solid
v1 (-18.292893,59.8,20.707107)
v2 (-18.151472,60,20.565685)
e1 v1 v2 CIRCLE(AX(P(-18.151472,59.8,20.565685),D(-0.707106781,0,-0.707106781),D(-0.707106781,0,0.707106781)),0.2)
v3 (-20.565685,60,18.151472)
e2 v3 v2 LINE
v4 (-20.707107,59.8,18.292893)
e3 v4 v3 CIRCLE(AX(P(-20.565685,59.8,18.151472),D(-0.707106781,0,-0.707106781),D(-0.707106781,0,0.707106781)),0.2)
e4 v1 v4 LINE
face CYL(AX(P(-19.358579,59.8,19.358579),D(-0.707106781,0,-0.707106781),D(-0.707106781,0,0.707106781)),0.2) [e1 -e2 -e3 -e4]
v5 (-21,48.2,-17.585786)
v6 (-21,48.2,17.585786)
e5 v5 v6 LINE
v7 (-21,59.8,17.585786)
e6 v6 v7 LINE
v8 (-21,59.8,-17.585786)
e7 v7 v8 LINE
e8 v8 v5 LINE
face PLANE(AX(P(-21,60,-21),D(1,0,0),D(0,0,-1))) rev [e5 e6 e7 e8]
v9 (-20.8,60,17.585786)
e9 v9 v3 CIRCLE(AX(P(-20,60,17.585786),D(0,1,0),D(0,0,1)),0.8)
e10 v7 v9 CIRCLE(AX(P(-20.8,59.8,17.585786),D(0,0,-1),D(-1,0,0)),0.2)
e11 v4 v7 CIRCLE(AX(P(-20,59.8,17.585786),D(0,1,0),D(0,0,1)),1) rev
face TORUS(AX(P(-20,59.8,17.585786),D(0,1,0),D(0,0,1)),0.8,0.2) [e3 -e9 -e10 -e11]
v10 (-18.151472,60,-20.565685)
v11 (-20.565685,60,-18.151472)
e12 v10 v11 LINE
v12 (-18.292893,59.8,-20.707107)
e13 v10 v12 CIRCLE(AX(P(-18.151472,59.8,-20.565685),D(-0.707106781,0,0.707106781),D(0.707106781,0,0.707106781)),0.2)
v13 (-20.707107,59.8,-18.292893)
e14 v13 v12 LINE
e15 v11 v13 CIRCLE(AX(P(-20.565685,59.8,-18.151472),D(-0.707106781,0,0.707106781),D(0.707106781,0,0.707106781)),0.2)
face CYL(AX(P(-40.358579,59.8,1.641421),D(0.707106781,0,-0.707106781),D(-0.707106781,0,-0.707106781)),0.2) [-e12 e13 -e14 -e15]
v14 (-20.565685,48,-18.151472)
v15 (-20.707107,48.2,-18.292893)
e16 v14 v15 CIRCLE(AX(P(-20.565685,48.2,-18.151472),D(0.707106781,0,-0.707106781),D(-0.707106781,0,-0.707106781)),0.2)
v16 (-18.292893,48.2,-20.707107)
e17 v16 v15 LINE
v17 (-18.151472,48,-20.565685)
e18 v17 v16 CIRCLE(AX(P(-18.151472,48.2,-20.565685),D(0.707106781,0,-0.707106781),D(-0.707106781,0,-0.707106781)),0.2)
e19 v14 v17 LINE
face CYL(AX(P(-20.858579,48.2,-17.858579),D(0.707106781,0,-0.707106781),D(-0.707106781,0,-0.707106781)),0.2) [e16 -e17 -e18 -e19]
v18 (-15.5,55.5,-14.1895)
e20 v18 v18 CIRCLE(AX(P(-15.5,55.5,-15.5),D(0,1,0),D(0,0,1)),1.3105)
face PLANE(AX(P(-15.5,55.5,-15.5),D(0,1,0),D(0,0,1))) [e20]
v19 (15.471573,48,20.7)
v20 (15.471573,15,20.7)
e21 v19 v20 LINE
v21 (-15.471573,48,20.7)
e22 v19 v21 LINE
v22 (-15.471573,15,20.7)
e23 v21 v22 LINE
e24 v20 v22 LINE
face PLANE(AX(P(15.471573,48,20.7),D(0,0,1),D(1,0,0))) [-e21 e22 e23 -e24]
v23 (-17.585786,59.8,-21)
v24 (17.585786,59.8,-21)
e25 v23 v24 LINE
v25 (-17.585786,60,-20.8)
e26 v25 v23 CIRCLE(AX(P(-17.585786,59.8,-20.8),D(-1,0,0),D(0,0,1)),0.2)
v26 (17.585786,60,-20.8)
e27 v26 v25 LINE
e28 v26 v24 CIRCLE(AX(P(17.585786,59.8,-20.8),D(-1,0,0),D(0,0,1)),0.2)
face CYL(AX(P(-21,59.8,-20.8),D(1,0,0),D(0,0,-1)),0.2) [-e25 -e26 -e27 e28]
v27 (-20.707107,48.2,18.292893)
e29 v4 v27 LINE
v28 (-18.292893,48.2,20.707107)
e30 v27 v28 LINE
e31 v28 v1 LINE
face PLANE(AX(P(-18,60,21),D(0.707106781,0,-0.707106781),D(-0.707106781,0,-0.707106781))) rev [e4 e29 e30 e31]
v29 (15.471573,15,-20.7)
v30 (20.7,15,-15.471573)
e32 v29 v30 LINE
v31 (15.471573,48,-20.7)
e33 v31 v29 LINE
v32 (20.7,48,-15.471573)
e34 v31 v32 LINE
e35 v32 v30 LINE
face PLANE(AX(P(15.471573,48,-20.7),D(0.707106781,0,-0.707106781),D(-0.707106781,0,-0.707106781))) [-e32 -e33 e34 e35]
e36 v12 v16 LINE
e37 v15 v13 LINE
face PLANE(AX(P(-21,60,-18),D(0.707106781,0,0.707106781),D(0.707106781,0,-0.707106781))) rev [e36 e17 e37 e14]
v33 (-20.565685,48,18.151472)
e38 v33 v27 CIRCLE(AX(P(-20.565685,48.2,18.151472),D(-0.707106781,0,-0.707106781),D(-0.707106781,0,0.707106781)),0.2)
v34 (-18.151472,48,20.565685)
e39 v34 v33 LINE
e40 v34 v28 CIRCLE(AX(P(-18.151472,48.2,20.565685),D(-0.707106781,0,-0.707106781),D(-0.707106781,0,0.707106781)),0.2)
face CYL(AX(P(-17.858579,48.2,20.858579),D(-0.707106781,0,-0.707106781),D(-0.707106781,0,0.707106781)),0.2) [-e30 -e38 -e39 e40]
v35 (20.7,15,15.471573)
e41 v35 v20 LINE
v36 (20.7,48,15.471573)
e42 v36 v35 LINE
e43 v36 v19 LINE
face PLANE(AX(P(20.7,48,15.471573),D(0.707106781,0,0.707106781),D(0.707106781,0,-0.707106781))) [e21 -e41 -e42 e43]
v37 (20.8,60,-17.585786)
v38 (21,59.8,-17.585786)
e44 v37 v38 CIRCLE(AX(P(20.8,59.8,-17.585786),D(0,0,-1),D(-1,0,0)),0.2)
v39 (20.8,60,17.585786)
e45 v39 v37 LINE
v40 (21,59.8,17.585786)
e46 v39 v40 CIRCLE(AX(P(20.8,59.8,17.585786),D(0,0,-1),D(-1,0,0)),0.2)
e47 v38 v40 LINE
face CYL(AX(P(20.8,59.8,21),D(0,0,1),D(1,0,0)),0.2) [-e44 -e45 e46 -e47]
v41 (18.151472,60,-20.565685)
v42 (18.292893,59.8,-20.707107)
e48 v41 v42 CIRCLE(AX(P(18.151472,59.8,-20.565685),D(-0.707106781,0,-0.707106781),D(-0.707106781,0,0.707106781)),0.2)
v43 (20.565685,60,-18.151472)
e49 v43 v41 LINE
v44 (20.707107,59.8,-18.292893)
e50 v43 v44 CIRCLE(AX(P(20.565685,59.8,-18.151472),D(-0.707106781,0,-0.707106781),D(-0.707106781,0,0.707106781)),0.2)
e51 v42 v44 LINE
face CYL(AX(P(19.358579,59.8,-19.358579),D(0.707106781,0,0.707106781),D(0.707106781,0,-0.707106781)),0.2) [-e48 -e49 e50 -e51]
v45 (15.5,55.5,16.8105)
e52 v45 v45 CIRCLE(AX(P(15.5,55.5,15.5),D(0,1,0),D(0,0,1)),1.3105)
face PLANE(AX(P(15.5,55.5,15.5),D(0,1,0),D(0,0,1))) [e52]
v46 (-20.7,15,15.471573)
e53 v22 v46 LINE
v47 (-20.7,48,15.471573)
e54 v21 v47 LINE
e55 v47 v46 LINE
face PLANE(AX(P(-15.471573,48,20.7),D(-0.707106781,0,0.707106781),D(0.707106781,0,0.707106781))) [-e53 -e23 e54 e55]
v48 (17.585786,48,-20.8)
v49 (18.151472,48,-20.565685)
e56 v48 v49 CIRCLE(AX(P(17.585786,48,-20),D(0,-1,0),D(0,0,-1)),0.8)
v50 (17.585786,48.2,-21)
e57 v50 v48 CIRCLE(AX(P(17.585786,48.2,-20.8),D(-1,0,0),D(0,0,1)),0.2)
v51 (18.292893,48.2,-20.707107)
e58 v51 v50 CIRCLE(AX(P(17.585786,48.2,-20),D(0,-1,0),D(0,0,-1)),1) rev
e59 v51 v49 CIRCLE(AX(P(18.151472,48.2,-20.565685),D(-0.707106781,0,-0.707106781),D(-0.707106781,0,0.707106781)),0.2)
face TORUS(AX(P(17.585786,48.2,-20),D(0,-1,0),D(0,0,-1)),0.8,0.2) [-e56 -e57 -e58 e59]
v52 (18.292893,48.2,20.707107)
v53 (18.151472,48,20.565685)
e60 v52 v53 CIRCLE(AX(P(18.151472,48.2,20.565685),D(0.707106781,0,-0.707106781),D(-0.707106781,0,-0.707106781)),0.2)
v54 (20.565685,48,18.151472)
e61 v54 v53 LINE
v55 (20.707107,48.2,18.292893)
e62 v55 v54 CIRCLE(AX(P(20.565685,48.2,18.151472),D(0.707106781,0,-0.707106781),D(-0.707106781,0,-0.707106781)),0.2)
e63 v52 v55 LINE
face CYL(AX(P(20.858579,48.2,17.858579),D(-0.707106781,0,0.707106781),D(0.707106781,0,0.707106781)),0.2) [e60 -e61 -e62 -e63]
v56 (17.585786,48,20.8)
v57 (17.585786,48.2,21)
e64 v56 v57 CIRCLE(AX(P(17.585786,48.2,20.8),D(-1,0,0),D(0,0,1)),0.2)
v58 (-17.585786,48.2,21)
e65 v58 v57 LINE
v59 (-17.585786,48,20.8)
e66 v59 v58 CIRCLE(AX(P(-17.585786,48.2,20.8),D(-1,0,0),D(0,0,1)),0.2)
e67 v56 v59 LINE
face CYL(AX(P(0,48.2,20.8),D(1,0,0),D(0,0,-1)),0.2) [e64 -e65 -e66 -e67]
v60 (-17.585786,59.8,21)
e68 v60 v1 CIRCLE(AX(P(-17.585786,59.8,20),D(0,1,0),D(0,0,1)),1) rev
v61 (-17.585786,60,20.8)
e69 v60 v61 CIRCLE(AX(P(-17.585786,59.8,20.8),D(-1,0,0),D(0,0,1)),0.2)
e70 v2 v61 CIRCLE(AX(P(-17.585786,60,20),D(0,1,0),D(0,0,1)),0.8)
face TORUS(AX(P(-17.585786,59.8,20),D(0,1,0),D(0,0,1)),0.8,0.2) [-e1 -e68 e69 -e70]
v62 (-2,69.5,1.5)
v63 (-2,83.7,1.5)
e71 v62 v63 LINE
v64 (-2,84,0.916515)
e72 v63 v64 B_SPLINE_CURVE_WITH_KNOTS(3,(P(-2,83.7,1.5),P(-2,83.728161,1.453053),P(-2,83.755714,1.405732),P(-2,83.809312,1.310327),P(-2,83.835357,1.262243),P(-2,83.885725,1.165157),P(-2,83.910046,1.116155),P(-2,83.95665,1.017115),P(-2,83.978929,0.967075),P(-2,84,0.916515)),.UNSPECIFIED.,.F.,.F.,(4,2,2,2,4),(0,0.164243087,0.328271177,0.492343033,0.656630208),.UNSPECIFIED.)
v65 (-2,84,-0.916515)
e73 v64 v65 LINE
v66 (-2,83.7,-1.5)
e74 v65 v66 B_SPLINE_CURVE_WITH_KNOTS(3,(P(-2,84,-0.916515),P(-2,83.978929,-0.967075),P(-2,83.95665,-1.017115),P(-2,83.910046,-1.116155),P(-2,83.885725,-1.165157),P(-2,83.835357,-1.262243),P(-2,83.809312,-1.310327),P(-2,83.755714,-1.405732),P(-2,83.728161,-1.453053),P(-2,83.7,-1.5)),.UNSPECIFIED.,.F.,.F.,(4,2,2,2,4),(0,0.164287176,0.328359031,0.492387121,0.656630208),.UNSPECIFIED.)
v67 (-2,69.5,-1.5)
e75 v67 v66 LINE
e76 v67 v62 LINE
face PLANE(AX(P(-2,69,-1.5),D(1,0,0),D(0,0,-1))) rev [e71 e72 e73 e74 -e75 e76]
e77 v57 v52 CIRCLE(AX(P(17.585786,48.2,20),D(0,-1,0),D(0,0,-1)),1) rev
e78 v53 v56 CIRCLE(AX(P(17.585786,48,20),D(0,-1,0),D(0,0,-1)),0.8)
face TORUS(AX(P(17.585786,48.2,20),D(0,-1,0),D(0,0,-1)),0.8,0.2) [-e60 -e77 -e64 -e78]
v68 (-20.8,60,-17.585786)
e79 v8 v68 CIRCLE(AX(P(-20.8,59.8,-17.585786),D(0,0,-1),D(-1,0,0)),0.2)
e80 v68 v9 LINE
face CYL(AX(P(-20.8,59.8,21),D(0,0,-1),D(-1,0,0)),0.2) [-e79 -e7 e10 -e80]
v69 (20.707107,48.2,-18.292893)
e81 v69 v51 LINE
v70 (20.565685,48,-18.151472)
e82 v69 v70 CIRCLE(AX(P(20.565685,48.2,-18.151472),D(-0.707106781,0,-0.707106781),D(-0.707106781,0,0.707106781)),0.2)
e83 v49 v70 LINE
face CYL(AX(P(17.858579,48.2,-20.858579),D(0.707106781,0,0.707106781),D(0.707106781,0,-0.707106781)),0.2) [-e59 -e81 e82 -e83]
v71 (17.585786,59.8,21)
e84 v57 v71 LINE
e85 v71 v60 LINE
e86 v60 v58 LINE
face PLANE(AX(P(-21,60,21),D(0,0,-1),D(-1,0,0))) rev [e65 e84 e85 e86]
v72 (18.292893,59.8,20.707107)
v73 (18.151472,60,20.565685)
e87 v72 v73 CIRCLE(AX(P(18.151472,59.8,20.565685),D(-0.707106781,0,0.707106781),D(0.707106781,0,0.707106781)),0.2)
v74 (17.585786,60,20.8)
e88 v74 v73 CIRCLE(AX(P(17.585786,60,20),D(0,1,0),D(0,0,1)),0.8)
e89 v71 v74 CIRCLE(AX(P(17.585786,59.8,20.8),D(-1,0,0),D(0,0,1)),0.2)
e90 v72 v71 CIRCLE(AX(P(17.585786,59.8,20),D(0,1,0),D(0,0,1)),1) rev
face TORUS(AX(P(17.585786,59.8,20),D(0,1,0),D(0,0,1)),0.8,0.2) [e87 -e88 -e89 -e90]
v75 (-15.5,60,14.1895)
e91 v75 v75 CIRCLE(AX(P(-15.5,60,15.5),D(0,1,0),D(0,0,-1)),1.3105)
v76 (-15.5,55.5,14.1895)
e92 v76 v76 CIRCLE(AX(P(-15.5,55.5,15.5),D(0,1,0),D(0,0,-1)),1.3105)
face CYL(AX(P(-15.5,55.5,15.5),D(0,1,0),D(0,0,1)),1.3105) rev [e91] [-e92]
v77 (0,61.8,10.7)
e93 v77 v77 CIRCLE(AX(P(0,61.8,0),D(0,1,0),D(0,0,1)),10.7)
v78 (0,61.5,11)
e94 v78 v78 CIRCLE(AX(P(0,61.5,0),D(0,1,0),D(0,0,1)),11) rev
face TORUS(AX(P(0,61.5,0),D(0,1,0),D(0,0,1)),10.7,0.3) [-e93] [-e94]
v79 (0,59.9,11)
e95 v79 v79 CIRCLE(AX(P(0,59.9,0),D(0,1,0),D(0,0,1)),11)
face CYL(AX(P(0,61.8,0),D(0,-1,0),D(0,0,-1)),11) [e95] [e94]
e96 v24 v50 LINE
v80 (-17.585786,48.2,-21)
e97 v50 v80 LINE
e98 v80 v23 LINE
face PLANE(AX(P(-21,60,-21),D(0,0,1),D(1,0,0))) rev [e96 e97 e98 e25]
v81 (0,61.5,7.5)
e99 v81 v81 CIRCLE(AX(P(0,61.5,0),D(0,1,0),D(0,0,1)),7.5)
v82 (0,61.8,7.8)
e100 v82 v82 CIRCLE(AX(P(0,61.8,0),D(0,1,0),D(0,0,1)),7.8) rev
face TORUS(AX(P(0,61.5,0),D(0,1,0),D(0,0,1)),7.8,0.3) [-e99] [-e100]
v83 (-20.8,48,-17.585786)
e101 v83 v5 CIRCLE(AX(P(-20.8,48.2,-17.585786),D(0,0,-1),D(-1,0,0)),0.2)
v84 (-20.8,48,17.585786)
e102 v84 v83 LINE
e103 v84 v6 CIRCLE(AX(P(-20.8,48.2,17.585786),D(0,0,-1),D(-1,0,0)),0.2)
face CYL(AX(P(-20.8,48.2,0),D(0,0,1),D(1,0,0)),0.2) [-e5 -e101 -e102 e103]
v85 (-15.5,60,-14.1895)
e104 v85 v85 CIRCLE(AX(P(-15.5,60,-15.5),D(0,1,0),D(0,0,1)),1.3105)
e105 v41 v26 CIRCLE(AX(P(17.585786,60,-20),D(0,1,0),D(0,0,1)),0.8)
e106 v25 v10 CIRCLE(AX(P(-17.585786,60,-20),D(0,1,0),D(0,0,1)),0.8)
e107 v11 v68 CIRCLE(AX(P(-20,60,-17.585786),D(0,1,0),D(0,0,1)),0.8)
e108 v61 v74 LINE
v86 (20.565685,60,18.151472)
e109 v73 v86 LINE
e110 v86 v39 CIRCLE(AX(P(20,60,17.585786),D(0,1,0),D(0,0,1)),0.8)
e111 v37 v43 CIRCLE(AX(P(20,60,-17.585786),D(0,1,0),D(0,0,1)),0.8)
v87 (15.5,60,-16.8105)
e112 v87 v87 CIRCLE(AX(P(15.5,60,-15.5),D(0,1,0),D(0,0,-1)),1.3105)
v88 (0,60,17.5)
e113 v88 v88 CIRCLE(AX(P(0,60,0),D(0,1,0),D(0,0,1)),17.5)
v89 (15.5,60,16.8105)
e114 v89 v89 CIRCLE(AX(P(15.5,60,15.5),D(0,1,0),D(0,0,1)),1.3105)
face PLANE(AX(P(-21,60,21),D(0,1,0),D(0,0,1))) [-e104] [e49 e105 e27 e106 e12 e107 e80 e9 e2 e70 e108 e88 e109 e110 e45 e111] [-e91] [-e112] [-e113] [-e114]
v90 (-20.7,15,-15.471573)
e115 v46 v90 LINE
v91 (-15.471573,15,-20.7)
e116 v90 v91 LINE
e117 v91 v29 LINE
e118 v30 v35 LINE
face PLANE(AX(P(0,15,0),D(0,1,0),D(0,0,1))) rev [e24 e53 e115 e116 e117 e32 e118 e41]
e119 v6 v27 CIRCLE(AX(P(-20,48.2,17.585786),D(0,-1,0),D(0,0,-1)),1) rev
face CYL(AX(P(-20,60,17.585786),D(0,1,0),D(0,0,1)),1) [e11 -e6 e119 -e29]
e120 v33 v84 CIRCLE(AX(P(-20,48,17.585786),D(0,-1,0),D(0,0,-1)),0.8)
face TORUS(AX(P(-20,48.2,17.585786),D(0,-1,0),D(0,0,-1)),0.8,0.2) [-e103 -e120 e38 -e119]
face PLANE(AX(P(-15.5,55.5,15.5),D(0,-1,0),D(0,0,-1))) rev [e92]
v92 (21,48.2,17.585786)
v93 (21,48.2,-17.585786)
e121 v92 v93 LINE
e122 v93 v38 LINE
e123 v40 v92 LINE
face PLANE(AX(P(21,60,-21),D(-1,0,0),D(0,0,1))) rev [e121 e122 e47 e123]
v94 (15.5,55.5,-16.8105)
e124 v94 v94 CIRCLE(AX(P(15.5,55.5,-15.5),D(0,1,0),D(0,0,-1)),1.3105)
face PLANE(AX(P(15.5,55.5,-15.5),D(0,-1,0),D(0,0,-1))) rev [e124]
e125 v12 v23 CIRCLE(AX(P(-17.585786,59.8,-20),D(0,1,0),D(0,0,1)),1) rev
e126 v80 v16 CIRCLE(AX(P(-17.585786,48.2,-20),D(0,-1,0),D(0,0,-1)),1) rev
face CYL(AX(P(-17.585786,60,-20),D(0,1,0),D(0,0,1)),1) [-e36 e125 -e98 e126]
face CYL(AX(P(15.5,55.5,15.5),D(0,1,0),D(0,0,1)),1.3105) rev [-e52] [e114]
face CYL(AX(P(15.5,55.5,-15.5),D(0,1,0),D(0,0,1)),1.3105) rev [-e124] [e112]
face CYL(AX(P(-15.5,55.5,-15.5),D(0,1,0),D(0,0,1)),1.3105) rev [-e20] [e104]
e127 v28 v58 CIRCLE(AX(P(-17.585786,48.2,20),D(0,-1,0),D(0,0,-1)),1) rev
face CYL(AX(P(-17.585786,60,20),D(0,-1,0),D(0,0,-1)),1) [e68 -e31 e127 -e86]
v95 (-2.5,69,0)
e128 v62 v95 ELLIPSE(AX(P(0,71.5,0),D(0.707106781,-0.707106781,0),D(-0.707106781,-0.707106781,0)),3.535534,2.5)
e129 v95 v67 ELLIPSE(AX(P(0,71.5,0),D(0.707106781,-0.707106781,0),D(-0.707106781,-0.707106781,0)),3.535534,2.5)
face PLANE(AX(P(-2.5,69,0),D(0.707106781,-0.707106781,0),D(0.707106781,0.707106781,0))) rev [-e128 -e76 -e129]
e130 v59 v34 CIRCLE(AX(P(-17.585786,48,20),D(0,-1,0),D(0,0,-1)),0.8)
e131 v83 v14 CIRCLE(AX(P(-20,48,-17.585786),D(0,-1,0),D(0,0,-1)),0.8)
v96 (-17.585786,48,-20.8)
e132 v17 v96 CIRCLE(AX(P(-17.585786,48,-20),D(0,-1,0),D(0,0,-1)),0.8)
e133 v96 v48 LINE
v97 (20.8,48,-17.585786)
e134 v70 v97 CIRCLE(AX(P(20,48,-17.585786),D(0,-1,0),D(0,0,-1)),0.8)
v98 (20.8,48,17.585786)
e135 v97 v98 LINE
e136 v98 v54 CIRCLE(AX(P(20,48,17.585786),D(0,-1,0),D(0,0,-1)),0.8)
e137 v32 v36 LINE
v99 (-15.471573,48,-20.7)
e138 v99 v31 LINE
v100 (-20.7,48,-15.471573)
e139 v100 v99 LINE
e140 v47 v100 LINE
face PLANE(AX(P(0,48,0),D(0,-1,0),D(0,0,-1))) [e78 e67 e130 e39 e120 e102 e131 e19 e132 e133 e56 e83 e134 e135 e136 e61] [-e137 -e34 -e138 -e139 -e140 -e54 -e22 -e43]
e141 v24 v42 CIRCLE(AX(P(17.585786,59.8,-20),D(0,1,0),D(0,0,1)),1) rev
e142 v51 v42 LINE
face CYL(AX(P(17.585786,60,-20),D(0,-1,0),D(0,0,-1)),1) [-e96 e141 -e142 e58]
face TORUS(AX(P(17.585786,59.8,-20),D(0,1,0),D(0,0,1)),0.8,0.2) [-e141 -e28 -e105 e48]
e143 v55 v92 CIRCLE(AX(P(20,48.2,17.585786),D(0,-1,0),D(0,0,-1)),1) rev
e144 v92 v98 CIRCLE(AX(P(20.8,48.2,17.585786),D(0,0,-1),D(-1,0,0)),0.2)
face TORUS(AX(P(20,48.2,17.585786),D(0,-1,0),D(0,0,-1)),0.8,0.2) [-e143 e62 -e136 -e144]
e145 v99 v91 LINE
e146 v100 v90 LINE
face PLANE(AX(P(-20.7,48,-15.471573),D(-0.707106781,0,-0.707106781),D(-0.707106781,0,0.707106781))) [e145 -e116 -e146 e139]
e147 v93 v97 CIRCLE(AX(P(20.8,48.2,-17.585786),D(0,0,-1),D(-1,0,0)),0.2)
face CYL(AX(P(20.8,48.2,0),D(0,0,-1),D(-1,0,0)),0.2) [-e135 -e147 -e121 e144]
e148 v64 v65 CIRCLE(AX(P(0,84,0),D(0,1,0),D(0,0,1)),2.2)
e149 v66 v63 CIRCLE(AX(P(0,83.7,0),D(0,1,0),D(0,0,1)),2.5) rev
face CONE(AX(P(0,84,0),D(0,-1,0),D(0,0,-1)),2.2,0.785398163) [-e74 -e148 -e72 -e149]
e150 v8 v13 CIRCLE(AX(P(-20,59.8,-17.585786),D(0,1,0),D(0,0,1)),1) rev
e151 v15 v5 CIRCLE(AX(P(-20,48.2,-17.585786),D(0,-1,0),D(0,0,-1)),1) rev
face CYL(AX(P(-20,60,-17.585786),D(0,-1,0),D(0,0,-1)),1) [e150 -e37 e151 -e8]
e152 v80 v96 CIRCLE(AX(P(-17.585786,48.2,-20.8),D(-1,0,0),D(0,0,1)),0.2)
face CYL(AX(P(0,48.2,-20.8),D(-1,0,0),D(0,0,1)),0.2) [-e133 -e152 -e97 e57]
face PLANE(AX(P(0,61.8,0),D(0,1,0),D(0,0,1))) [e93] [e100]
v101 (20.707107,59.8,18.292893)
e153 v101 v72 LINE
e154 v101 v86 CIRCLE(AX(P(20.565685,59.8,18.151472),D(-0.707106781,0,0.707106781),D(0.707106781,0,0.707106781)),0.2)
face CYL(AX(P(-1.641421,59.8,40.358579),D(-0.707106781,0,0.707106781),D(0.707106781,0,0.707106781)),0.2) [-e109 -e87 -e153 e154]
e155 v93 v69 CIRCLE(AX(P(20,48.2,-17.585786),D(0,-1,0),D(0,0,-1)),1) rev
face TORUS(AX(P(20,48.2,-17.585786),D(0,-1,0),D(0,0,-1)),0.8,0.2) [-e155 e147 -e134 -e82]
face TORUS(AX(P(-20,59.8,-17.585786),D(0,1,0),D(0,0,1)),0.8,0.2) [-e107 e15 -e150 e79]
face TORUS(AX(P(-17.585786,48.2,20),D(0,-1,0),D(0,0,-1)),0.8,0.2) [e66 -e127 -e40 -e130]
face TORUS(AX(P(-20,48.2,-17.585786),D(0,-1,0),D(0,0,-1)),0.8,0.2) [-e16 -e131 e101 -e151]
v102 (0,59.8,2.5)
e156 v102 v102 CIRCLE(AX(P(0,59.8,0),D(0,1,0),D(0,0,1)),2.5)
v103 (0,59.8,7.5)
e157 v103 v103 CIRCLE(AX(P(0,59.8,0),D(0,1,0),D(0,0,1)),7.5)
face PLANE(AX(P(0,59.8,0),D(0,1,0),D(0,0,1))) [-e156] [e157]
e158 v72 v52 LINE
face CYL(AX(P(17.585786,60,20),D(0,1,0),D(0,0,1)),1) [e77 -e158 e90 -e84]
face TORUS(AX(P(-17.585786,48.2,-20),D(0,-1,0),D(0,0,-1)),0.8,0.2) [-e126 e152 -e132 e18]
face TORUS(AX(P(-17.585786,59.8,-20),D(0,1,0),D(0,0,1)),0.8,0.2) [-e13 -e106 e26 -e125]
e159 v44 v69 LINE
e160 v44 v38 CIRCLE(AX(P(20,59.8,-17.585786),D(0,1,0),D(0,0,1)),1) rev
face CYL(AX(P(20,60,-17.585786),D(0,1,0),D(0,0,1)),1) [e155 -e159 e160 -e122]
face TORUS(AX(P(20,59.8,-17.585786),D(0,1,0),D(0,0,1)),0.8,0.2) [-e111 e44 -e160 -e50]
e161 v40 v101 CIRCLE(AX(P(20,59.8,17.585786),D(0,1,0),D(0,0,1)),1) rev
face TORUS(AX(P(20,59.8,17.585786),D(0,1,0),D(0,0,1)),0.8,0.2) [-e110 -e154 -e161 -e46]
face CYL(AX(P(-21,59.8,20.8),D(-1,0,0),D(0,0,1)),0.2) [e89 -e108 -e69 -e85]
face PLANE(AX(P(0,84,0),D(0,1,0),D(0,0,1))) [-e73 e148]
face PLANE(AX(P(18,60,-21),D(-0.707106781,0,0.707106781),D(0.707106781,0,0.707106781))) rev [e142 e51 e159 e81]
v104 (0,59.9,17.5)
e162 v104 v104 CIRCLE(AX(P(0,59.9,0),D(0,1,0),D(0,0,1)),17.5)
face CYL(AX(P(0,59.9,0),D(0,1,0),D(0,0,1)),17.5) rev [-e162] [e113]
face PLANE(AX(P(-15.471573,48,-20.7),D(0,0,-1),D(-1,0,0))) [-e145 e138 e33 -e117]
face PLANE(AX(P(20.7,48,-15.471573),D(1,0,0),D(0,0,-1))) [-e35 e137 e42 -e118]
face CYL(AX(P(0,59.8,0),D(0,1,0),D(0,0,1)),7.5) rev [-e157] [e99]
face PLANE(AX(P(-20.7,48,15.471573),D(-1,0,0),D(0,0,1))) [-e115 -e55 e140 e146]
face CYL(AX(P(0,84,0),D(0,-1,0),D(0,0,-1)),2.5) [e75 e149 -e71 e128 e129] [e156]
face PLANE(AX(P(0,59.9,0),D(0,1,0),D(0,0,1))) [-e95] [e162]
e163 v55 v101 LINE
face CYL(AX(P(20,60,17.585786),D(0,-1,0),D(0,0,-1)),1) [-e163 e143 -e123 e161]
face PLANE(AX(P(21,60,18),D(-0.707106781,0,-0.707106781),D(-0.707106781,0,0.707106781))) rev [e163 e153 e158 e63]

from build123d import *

# Parameters (mm, degrees)
SKETCH_1_W               = 42
SKETCH_1_H               = 42
EXTRUDE_1_DEPTH          = 60
CHAMFER_3_SIZE           = 3
SKETCH_2_R               = 11
EXTRUDE_2_DEPTH          = 1.8
SKETCH_3_R               = 2.5
EXTRUDE_3_DEPTH          = 24
SKETCH_4_OUTSIDE_W       = 64.576
SKETCH_4_OUTSIDE_H       = 64.576
CUT_EXTRUDE_1_DEPTH      = 36
FILLET_2_R               = 1
FILLET_3_R               = 0.2
CUT_EXTRUDE_START        = -15
CUT_EXTRUDE_5_DEPTH      = 15
CHAMFER_5_SIZE           = 0.3
CHAMFER_4_SIZE           = 0.5
SKETCH_6_R               = 1.3105
CUT_EXTRUDE_2_DEPTH      = 4.5
CUT_EXTRUDE_START_2      = -2
SKETCH_7_R               = 7.5
SKETCH_7_R_2             = 2.5
CUT_EXTRUDE_3_DEPTH      = 2
SKETCH_8_R               = 4.125
EXTRUDE_5_DEPTH          = 1.2
SKETCH_9_R               = 2.25
SKETCH_9_R_2             = 2.05
EXTRUDE_6_DEPTH          = 15.4
SKETCH_10_R              = 0.65
EXTRUDE_8_DEPTH          = 15.4
CUT_EXTRUDE_START_3      = -0.1
SKETCH_15_R              = 17.5
SKETCH_15_R_2            = 11
CUT_EXTRUDE_6_DEPTH      = 0.1
FILLET_4_R               = 0.3
PATTERN_CIRCULAR_3_COUNT = 4
SKETCH_20_W              = 88.292571494
SKETCH_20_H              = 79.893843274
CUT_EXTRUDE_13_DEPTH     = 15


with BuildPart() as part:
    # 草图1 → 凸台-拉伸1 (new body)
    with BuildSketch(Plane(origin=(0, 0, 0), x_dir=(1, 0, 0), z_dir=(0, 1, 0))):
        Rectangle(SKETCH_1_W, SKETCH_1_H)
    extrude(amount=EXTRUDE_1_DEPTH)

    # 倒角3
    chamfer_3_edges = [part.edges().sort_by_distance(p)[0] for p in [
        (-21, 30, -21),
        (21, 30, -21),
        (21, 30, 21),
        (-21, 30, 21),
    ]]
    chamfer(chamfer_3_edges, length=CHAMFER_3_SIZE)

    # 草图2 → 凸台-拉伸2 (add)
    with BuildSketch(Plane(origin=(0, 60, 0), x_dir=(1, 0, 0), z_dir=(0, 1, 0))):
        with Locations(Location((0, 0, 0), (0, 0, 270))):
            Circle(SKETCH_2_R)
    extrude(amount=EXTRUDE_2_DEPTH)

    # 草图3 → 凸台-拉伸3 (add)
    with BuildSketch(Plane(origin=(0, 60, 0), x_dir=(1, 0, 0), z_dir=(0, 1, 0))):
        with Locations(Location((0, 0, 0), (0, 0, 270))):
            Circle(SKETCH_3_R)
    extrude(amount=EXTRUDE_3_DEPTH)

    # 草图4 outside → 切除-拉伸1 (cut)
    with BuildSketch(Plane.XZ.offset(-12)):
        Rectangle(SKETCH_4_OUTSIDE_W, SKETCH_4_OUTSIDE_H)
        Polygon((15.471572875, 20.7), (-15.471572875, 20.7), (-20.7, 15.471572875), (-20.7, -15.471572875), (-15.471572875, -20.7), (15.471572875, -20.7), (20.7, -15.471572875), (20.7, 15.471572875), align=None, mode=Mode.SUBTRACT)
    extrude(amount=-CUT_EXTRUDE_1_DEPTH, mode=Mode.SUBTRACT)

    # 圆角2
    fillet_2_edges = [part.edges().sort_by_distance(p)[0] for p in [
        (-18, 6, -21),
        (18, 54, -21),
        (21, 54, 18),
        (21, 6, -18),
        (-18, 54, 21),
        (18, 6, 21),
        (-21, 54, -18),
        (-21, 6, 18),
        (-18, 54, -21),
        (-21, 6, -18),
        (-21, 54, 18),
        (-18, 6, 21),
        (18, 54, 21),
        (21, 6, 18),
        (21, 54, -18),
        (18, 6, -21),
    ]]
    fillet(fillet_2_edges, radius=FILLET_2_R)

    # 圆角3
    fillet_3_edges = [part.edges().sort_by_distance(p)[0] for p in [
        (21, 12, 0),
        (21, 0, 0),
        (0, 0, -21),
        (19.5, 0, -19.5),
        (19.5, 0, 19.5),
        (0, 0, 21),
        (-19.5, 0, 19.5),
        (-21, 0, 0),
        (-19.5, 0, -19.5),
        (-20.923879533, 0, -17.96846987),
        (-17.96846987, 0, -20.923879533),
        (17.96846987, 0, -20.923879533),
        (20.923879533, 0, -17.96846987),
        (-20.923879533, 0, 17.96846987),
        (-17.96846987, 0, 20.923879533),
        (17.96846987, 0, 20.923879533),
        (20.923879533, 0, 17.96846987),
        (19.5, 12, 19.5),
        (19.5, 12, -19.5),
        (0, 12, -21),
        (-19.5, 12, -19.5),
        (-21, 12, 0),
        (-19.5, 12, 19.5),
        (0, 12, 21),
        (-20.923879533, 12, -17.96846987),
        (-17.96846987, 12, -20.923879533),
        (17.96846987, 12, -20.923879533),
        (20.923879533, 12, -17.96846987),
        (-20.923879533, 12, 17.96846987),
        (-17.96846987, 12, 20.923879533),
        (17.96846987, 12, 20.923879533),
        (20.923879533, 12, 17.96846987),
        (0, 48, -21),
        (0, 60, -21),
        (21, 60, 0),
        (19.5, 60, -19.5),
        (-19.5, 60, -19.5),
        (-21, 60, 0),
        (-19.5, 60, 19.5),
        (0, 60, 21),
        (19.5, 60, 19.5),
        (-20.923879533, 60, 17.96846987),
        (-17.96846987, 60, 20.923879533),
        (17.96846987, 60, 20.923879533),
        (20.923879533, 60, 17.96846987),
        (17.96846987, 60, -20.923879533),
        (20.923879533, 60, -17.96846987),
        (-20.923879533, 60, -17.96846987),
        (-17.96846987, 60, -20.923879533),
        (-19.5, 48, -19.5),
        (0, 48, 21),
        (-19.5, 48, 19.5),
        (-21, 48, 0),
        (19.5, 48, -19.5),
        (21, 48, 0),
        (19.5, 48, 19.5),
        (-20.923879533, 48, 17.96846987),
        (-17.96846987, 48, 20.923879533),
        (17.96846987, 48, 20.923879533),
        (20.923879533, 48, 17.96846987),
        (17.96846987, 48, -20.923879533),
        (20.923879533, 48, -17.96846987),
        (-20.923879533, 48, -17.96846987),
        (-17.96846987, 48, -20.923879533),
    ]]
    fillet(fillet_3_edges, radius=FILLET_3_R)

    # 草图14 → 切除-拉伸5 (cut)
    with BuildSketch(Plane(origin=(0, 84, 0), x_dir=(1, 0, 0), z_dir=(0, 1, 0)).offset(CUT_EXTRUDE_START)):
        with BuildLine():
            Line((-2, 1.5), (-2, -1.5))
            ThreePointArc((-2, -1.5), (-2.5, 0), (-2, 1.5))
        make_face()
    extrude(amount=CUT_EXTRUDE_5_DEPTH, mode=Mode.SUBTRACT)

    # 倒角5
    chamfer_5_edges = [part.edges().sort_by_distance(p)[0] for p in [
        (2.236067977, 84, -1.118033989),
    ]]
    chamfer(chamfer_5_edges, length=CHAMFER_5_SIZE)

    # 倒角4
    chamfer_4_edges = [part.edges().sort_by_distance(p)[0] for p in [
        (-2, 69, 0),
    ]]
    chamfer(chamfer_4_edges, length=CHAMFER_4_SIZE - 0.0001)  # a hair under: the kernel refuses the full size

    # 草图6 → 切除-拉伸2 (cut)
    with BuildSketch(Plane(origin=(0, 60, 0), x_dir=(1, 0, 0), z_dir=(0, 1, 0))):
        with Locations(Location((-15.5, 15.5, 0), (0, 0, 270))):
            Circle(SKETCH_6_R)
        with Locations(Location((15.5, 15.5, 0), (0, 0, 90))):
            Circle(SKETCH_6_R)
        with Locations(Location((15.5, -15.5, 0), (0, 0, 270))):
            Circle(SKETCH_6_R)
        with Locations(Location((-15.5, -15.5, 0), (0, 0, 90))):
            Circle(SKETCH_6_R)
    extrude(amount=-CUT_EXTRUDE_2_DEPTH, mode=Mode.SUBTRACT)

    # 草图7 → 切除-拉伸3 (cut)
    with BuildSketch(Plane(origin=(0, 61.8, 0), x_dir=(1, 0, 0), z_dir=(0, 1, 0)).offset(CUT_EXTRUDE_START_2)):
        with Locations(Location((0, 0, 0), (0, 0, 270))):
            Circle(SKETCH_7_R)
        with Locations(Location((0, 0, 0), (0, 0, 143.130102354))):
            Circle(SKETCH_7_R_2, mode=Mode.SUBTRACT)
    extrude(amount=CUT_EXTRUDE_3_DEPTH, mode=Mode.SUBTRACT)

    # 草图8 → 凸台-拉伸5 (add)
    with BuildSketch(Plane(origin=(21, 0, 0), x_dir=(0, 0, -1), z_dir=(1, 0, 0))):
        with Locations(Location((0, 6, 0), (0, 0, 180))):
            Circle(SKETCH_8_R)
    extrude(amount=EXTRUDE_5_DEPTH)

    # 草图9 → 凸台-拉伸6 (add)
    with BuildSketch(Plane(origin=(22.2, 0, 0), x_dir=(0, 0, -1), z_dir=(1, 0, 0))):
        with Locations(Location((0, 6, 0), (0, 0, 180))):
            Circle(SKETCH_9_R)
        with Locations(Location((0, 6, 0), (0, 0, 180))):
            Circle(SKETCH_9_R_2, mode=Mode.SUBTRACT)
    extrude(amount=EXTRUDE_6_DEPTH)

    # 草图10 → 凸台-拉伸8 (add)
    with BuildSketch(Plane(origin=(22.2, 0, 0), x_dir=(0, 0, -1), z_dir=(1, 0, 0))):
        with Locations((0.952627944, 6.55)):
            Circle(SKETCH_10_R)
    extrude_8 = extrude(amount=EXTRUDE_8_DEPTH)

    # 草图15 → 切除-拉伸6 (cut)
    with BuildSketch(Plane(origin=(0, 60, 0), x_dir=(1, 0, 0), z_dir=(0, 1, 0)).offset(CUT_EXTRUDE_START_3)):
        with Locations(Location((0, 0, 0), (0, 0, 270))):
            Circle(SKETCH_15_R)
        with Locations(Location((0, 0, 0), (0, 0, 270))):
            Circle(SKETCH_15_R_2, mode=Mode.SUBTRACT)
    extrude(amount=CUT_EXTRUDE_6_DEPTH, mode=Mode.SUBTRACT)

    # 圆角4
    fillet_4_edges = [part.edges().sort_by_distance(p)[0] for p in [
        (0, 61.8, -11),
        (0, 61.8, -7.5),
    ]]
    fillet(fillet_4_edges, radius=FILLET_4_R)

    # 阵列(圆周)3: 凸台-拉伸8 ×4 about axis
    pattern_circular_3_axis = Axis((0, 6, 0), (1, 0, 0))
    for i in range(1, PATTERN_CIRCULAR_3_COUNT):
        add(extrude_8.rotate(pattern_circular_3_axis, i * 360 / PATTERN_CIRCULAR_3_COUNT))

    # 草图20 → 切除-拉伸13 (cut)
    with BuildSketch(Plane.XZ):
        Rectangle(SKETCH_20_W, SKETCH_20_H)
    extrude(amount=-CUT_EXTRUDE_13_DEPTH, mode=Mode.SUBTRACT)


solid = part.part
